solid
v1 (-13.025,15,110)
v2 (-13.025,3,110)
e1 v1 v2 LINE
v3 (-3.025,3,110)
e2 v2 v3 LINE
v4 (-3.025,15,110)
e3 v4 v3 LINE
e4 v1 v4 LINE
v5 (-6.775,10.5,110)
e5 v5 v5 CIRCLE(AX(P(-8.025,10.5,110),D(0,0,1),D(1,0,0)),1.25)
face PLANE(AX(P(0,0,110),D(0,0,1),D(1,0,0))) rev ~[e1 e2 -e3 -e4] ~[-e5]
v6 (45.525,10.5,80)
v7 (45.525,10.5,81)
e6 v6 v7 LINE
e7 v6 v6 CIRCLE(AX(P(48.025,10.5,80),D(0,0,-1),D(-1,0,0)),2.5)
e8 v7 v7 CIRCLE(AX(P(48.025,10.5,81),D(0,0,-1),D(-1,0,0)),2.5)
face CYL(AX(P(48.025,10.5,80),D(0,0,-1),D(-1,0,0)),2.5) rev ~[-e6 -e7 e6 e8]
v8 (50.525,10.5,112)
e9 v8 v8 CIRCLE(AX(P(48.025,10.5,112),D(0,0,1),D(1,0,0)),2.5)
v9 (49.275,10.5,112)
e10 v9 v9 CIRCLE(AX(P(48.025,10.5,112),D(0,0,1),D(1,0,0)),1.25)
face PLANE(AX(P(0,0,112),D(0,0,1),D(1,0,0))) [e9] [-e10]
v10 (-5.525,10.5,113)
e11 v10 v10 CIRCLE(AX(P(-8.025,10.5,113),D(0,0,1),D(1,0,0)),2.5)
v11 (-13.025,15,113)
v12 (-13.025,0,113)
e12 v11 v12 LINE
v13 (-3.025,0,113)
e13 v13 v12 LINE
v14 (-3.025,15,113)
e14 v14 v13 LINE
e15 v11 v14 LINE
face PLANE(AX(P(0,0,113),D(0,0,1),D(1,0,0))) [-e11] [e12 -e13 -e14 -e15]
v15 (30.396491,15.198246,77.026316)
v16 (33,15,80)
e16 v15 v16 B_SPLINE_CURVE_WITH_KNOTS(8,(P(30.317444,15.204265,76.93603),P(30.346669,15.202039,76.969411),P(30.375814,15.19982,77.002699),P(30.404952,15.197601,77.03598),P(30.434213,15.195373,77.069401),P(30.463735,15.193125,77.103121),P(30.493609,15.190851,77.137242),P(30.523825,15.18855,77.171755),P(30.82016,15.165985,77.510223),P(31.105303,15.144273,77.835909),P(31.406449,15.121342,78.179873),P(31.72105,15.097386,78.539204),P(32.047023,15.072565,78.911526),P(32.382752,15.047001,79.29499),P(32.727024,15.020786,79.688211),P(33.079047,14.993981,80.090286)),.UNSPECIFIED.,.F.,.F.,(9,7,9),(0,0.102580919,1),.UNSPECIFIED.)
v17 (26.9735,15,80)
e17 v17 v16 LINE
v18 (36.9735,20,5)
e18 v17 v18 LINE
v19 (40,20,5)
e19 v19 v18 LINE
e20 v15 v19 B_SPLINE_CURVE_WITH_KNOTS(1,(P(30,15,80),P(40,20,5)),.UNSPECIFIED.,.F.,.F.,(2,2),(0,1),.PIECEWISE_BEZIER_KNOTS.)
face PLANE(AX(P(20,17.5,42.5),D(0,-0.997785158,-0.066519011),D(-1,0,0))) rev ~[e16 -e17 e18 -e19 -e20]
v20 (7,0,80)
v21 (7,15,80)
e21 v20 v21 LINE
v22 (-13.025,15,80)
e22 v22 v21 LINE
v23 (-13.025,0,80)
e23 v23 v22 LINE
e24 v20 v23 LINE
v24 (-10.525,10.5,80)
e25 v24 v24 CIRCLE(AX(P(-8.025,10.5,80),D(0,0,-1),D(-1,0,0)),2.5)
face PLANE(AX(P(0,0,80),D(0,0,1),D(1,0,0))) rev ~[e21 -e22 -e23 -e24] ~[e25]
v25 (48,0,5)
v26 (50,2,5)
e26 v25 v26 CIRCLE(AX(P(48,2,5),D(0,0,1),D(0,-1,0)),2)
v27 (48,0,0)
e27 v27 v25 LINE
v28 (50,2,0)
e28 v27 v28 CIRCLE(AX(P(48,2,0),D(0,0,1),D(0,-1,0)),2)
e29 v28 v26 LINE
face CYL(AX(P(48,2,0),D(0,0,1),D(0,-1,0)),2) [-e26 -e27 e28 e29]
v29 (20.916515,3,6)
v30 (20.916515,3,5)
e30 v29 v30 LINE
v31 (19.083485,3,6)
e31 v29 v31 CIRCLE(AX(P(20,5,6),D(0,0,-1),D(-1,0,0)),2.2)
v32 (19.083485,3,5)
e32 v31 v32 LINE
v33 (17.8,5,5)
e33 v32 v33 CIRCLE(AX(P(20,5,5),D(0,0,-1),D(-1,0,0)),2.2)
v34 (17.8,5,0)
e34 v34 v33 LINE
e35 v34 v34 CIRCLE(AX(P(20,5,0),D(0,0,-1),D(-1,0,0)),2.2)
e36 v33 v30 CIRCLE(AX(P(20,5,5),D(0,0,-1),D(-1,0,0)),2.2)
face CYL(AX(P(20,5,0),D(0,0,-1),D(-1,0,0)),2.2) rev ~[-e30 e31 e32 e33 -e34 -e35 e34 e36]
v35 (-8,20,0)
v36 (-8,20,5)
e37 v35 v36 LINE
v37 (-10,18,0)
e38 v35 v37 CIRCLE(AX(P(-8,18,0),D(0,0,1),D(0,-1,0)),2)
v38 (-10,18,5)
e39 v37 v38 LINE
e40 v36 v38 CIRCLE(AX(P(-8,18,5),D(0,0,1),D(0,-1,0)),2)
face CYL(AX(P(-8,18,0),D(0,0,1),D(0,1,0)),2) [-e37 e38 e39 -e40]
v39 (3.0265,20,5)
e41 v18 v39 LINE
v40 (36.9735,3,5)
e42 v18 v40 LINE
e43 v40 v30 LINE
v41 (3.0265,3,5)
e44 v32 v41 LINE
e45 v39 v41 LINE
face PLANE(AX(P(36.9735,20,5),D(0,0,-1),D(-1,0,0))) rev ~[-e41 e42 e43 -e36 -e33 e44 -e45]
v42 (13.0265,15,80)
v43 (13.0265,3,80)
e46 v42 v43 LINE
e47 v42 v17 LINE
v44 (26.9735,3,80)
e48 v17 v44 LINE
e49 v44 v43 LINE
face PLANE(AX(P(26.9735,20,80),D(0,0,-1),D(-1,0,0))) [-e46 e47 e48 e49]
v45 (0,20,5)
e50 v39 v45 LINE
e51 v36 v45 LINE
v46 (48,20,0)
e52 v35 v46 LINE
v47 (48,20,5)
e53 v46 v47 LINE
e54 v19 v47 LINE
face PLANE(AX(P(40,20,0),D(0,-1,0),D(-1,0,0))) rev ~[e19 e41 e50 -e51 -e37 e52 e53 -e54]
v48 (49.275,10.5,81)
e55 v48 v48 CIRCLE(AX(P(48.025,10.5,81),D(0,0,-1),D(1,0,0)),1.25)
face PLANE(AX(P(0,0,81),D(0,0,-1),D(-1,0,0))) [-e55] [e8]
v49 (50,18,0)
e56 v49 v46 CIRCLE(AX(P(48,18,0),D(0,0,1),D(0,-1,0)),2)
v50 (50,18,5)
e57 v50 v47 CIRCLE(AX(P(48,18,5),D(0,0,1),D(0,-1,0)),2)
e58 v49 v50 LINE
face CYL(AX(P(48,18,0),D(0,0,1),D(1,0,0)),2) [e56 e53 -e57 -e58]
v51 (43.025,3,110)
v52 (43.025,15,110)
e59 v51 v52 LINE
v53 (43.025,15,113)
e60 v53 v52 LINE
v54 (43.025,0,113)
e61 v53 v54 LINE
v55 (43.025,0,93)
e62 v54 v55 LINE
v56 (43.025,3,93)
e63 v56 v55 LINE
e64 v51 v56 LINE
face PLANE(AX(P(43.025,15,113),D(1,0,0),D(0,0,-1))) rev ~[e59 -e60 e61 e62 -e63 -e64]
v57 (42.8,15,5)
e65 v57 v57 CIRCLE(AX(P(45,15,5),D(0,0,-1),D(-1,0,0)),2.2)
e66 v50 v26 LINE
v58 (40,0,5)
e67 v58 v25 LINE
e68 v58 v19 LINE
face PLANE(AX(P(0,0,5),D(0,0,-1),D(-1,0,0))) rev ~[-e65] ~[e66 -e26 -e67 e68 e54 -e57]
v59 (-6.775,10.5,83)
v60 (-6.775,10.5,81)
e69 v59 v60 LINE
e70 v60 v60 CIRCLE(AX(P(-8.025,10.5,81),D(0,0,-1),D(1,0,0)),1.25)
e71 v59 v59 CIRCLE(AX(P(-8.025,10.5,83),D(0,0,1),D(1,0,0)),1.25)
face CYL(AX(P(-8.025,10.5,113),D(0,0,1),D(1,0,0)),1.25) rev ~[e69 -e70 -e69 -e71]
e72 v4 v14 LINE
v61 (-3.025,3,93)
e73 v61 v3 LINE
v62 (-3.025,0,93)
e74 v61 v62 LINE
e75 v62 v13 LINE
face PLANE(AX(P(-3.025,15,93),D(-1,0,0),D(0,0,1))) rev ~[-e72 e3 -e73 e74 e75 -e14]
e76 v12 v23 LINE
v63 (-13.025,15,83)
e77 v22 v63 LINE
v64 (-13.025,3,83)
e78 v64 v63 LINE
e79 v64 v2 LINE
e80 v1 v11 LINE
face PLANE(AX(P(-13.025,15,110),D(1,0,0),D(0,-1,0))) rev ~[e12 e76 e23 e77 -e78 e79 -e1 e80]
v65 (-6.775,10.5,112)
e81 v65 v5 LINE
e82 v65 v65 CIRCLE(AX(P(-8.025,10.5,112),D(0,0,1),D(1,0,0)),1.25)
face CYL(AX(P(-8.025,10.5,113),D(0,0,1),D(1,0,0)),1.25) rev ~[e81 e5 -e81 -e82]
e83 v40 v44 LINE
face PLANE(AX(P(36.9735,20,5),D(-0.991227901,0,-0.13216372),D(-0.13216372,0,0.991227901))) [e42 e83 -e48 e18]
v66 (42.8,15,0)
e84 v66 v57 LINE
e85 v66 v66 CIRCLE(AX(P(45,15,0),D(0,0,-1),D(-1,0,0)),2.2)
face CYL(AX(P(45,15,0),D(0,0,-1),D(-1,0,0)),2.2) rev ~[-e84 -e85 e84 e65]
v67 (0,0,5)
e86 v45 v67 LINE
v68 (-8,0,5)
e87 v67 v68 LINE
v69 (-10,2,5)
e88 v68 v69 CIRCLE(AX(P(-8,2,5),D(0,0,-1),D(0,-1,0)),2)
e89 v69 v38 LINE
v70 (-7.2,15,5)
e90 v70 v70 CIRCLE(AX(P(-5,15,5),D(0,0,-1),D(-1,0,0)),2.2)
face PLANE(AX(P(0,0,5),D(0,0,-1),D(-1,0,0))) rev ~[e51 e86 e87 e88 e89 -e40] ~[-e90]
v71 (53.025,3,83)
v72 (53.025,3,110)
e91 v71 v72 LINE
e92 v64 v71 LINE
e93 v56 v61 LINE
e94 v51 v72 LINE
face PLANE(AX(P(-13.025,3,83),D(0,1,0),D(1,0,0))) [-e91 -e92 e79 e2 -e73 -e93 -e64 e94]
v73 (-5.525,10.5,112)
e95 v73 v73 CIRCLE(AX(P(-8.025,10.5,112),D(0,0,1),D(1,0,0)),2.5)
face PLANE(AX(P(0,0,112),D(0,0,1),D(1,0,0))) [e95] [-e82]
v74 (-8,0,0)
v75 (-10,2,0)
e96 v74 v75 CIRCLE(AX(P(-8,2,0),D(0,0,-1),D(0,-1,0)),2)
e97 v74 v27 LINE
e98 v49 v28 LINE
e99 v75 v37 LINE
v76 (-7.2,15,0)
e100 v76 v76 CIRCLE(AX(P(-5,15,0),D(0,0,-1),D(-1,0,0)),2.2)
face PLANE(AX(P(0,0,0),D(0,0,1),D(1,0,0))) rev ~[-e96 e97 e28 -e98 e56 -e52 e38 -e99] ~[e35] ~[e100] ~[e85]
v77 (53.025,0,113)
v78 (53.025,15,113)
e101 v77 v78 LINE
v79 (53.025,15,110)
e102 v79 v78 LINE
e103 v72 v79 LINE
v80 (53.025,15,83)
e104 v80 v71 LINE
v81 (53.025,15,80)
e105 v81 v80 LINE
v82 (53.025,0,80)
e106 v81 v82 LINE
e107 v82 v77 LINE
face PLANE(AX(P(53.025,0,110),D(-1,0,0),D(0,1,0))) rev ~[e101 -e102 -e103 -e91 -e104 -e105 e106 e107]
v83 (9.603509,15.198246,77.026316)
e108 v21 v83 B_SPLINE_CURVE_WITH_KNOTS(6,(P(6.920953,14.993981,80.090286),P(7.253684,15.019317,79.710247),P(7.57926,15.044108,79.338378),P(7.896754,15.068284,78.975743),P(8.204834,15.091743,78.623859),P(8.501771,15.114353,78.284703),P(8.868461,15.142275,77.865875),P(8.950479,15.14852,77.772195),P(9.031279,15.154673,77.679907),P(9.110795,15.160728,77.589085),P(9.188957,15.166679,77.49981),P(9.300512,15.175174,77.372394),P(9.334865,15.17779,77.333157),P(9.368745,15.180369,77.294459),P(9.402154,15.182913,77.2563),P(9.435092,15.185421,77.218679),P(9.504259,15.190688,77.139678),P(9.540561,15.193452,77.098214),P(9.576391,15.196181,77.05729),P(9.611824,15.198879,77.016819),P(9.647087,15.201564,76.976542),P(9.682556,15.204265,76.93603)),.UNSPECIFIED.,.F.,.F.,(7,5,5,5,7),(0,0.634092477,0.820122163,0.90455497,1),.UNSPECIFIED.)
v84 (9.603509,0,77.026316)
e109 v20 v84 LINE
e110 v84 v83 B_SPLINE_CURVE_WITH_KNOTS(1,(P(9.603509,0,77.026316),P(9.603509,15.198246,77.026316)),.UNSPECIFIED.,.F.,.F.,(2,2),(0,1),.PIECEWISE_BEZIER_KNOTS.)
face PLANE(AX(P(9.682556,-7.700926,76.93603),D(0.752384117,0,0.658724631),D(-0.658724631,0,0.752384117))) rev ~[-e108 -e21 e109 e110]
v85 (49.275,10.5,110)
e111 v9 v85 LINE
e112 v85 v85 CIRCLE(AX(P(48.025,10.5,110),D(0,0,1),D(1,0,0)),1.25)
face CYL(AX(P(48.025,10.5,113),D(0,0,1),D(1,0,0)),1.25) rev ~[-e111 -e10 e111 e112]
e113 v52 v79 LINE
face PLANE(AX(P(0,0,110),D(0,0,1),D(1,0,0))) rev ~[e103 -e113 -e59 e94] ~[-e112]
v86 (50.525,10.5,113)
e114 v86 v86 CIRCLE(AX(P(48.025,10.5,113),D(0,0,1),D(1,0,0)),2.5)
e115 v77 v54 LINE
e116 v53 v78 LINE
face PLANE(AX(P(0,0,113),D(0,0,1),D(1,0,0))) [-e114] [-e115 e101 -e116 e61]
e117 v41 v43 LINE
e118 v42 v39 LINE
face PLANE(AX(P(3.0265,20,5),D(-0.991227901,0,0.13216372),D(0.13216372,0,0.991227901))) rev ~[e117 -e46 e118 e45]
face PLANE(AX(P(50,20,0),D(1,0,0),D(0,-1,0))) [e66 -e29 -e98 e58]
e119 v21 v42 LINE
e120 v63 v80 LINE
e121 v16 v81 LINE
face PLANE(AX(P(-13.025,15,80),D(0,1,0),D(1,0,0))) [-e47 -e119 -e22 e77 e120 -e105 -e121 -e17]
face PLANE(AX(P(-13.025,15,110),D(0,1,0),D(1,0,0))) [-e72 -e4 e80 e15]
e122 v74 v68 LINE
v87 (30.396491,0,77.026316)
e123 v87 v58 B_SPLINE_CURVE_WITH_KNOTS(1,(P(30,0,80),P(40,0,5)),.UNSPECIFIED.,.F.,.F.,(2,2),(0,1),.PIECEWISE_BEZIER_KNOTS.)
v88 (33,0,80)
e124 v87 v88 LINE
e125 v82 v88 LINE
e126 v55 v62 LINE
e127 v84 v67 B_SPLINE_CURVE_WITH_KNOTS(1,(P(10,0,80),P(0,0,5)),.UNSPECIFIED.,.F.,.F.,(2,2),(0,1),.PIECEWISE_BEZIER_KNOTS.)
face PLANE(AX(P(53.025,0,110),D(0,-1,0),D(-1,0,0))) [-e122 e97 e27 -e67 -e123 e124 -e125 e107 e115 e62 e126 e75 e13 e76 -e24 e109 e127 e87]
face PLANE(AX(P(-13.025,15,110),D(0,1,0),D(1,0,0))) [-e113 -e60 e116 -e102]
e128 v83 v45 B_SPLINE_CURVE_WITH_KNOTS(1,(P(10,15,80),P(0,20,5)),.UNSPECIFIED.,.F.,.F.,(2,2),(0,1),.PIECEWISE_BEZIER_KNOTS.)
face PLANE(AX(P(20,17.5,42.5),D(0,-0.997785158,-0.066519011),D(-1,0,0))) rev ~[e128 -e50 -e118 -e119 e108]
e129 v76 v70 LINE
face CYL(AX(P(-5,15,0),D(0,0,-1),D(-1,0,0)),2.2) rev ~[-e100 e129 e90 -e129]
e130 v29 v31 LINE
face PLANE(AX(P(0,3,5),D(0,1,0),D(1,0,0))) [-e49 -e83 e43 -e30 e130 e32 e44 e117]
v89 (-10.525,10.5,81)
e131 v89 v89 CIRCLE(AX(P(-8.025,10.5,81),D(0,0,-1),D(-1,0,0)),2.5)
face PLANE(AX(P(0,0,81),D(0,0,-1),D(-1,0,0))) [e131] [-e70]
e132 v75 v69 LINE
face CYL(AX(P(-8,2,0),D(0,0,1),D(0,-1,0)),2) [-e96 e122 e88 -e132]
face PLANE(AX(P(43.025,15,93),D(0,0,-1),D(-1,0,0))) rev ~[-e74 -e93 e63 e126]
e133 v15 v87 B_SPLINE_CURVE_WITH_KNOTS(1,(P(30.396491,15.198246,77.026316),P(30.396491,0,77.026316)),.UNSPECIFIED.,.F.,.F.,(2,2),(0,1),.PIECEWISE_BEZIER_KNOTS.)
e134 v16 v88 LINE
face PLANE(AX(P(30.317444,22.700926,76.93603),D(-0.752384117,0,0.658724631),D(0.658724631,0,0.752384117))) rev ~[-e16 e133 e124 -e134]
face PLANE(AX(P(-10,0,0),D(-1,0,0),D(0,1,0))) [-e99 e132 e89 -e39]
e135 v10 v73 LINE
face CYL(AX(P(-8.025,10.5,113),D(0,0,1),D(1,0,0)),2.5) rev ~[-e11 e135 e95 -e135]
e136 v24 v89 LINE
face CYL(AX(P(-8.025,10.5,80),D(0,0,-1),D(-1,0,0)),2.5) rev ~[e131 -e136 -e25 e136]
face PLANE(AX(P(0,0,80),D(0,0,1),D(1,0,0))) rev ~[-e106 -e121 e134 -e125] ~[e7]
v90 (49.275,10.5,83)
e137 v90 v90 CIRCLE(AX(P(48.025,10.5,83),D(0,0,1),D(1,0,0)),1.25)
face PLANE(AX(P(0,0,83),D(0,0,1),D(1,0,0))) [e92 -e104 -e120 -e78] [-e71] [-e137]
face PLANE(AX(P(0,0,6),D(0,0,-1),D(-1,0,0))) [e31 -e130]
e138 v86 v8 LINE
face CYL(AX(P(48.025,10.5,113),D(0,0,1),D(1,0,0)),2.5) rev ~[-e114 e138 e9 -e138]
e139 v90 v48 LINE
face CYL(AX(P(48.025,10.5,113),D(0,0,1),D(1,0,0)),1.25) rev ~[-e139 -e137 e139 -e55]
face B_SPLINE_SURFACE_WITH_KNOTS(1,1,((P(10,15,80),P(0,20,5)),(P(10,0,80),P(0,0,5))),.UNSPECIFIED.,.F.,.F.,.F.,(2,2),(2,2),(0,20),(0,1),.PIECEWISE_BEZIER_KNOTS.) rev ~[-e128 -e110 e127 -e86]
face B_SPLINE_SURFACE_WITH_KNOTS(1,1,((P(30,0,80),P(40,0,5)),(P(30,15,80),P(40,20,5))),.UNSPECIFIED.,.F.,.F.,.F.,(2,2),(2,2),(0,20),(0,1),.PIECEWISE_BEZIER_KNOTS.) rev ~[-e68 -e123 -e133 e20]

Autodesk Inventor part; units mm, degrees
ref_plane "YZ Plane" through (0, 0, 0) normal (1, 0, 0) x (0, 1, 0)
ref_plane "XZ Plane" through (0, 0, 0) normal (0, 1, 0) x (-1, 0, 0)
sketch "Sketch1" plane through (0, 0, 0) normal (0, 0, 1) x (1, 0, 0)
  line L0 (0, 0) -> (40, 0)
  line L1 (40, 0) -> (40, 20)
  line L2 (40, 20) -> (0, 20)
  line L3 (0, 20) -> (0, 0)
  dimension "d69" = 20
  dimension "d70" = 40
extrude "Extrusion1" add sketch "Sketch1" along normal blind 5
sketch "Sketch2" plane through (0, 0, 5) normal (0, 0, 1) x (1, 0, 0)
  line L0 (40, 20) -> (0, 20) projected
  line L1 (0, 0) -> (40, 0) projected
  line L2 (0, 20) -> (40, 20)
  line L3 (40, 20) -> (40, 0)
  line L4 (40, 0) -> (0, 0)
  line L5 (0, 0) -> (0, 20)
ref_plane "Work Plane1" through (0, 0, 80) normal (0, 0, 1) x (1, 0, 0)
sketch "Sketch3" plane through (0, 0, 80) normal (0, 0, 1) x (1, 0, 0)
  line L0 (10, 15) -> (30, 15)
  line L1 (30, 15) -> (30, 0)
  line L2 (30, 0) -> (10, 0)
  line L3 (10, 0) -> (10, 15)
  line L4 (0, 20) -> (0, 0) projected
  dimension "d71" = 20
  dimension "d72" = 15
  dimension "d73" = 10
loft "Loft1" add profiles "Sketch3" section 2 edges at (40, 10, 5) (20, 20, 5) (0, 10, 5) (20, 0, 5)
sketch "Sketch4" plane through (0, 0, 80) normal (0, 0, 1) x (1, 0, 0)
  line L0 (53.025, 0) -> (-13.025, 0)
  line L1 (-13.025, 0) -> (-13.025, 15)
  line L2 (-13.025, 15) -> (53.025, 15)
  line L3 (53.025, 15) -> (53.025, 0)
  line L4 (30, 0) -> (10, 0) projected
  point P0 (0, 0)
  dimension "d16" = 66.05
  dimension "d18" = 15
  dimension "d76" = 0
  dimension "d78" = 13.025
extrude "Extrusion2" add sketch "Sketch4" along normal blind 3
sketch "Sketch5" plane through (0, 0, 83) normal (0, 0, 1) x (1, 0, 0)
  line L0 (-13.025, 0) -> (53.025, 0) projected
  line L1 (-13.025, 15) -> (-13.025, 0) projected
  line L2 (53.025, 0) -> (-13.025, 0)
  line L3 (-13.025, 0) -> (-13.025, 3)
  line L4 (-13.025, 3) -> (53.025, 3)
  line L5 (53.025, 3) -> (53.025, 0)
  point P0 (0, 0)
  dimension "d22" = 3
extrude "Extrusion3" add sketch "Sketch5" along normal blind 27
sketch "Sketch6" plane through (0, 0, 110) normal (0, 0, 1) x (1, 0, 0)
  line L0 (53.025, 0) -> (53.025, 15) projected
  line L1 (-13.025, 15) -> (-13.025, 0) projected
  line L2 (53.025, 0) -> (-13.025, 0)
  line L3 (-13.025, 0) -> (-13.025, 15)
  line L4 (-13.025, 15) -> (53.025, 15)
  line L5 (53.025, 15) -> (53.025, 0)
  point P0 (0, 0)
extrude "Extrusion4" add sketch "Sketch6" along normal blind 3
sketch "Sketch7" plane through (0, 0, 113) normal (0, 0, 1) x (1, 0, 0)
  circle A0 centre (-8.025, 10.5) radius 1.25
  circle A1 centre (48.025, 10.5) radius 1.25
  line L0 (53.025, 3) -> (-13.025, 3) projected
  line L1 (-13.025, 3) -> (53.025, 3) projected
  point P0 (0, 0)
  point P1 (20, 3)
  dimension "d27" = 7.5
  dimension "d28" = 7.5
  dimension "d29" = 56.05
  dimension "d30" = 28.025
  dimension "d31" = 2.5
  dimension "d32" = 2.5
extrude "Extrusion5" cut sketch "Sketch7" against normal blind 35
sketch "Sketch10" plane through (0, 0, 113) normal (0, 0, 1) x (1, 0, 0)
  circle A0 centre (48.025, 10.5) radius 1.25 projected
  circle A1 centre (48.025, 10.5) radius 2.5
  circle A2 centre (-8.025, 10.5) radius 1.25 projected
  circle A3 centre (-8.025, 10.5) radius 2.5
  point P0 (0, 0)
  dimension "d61" = 5
  dimension "d62" = 5
extrude "Extrusion8" cut sketch "Sketch10" against normal blind 1
sketch "Sketch11" plane through (0, 0, 80) normal (0, 0, -1) x (-1, 0, 0)
  circle A0 centre (-48.025, 10.5) radius 1.25 projected
  circle A1 centre (-48.025, 10.5) radius 2.5
  circle A2 centre (8.025, 10.5) radius 1.25 projected
  circle A3 centre (8.025, 10.5) radius 2.5
  point P0 (0, 0)
  dimension "d65" = 5
  dimension "d66" = 5
extrude "Extrusion9" cut sketch "Sketch11" against normal blind 1
sketch "Sketch12" plane through (-13.025, 15, 110) normal (0, 1, 0) x (1, 0, 0)
  line L0 (0, -3) -> (66.05, -3) projected
  line L1 (10, -3) -> (56.05, -3)
  line L2 (56.05, -3) -> (56.05, 17)
  line L3 (56.05, 17) -> (10, 17)
  line L4 (10, 17) -> (10, -3)
  line L5 (0, 27) -> (0, 0) projected
  line L6 (66.05, 27) -> (66.05, 0) projected
  line L7 (66.05, 27) -> (0, 27) projected
  point P0 (13.025, 110)
  dimension "d79" = 10
  dimension "d80" = 10
  dimension "d81" = 10
extrude "Extrusion10" cut sketch "Sketch12" against normal blind 15
sketch "Sketch15" plane through (0, 0, 0) normal (0, 0, -1) x (-1, 0, 0)
  line L0 (-30, 0) -> (-53.025, 0) projected
  line L1 (10, 20) -> (-50, 20)
  line L2 (-50, 20) -> (-50, 0)
  line L3 (-50, 0) -> (10, 0)
  line L4 (10, 0) -> (10, 20)
  line L5 (0, 20) -> (0, 0) projected
  line L6 (-40, 0) -> (-40, 20) projected
  dimension "d119" = 10
  dimension "d120" = 10
extrude "Extrusion13" add sketch "Sketch15" against normal blind 5 contours L0 L2 L1 L6 | L5 L1 L4 L3
fillet "Fillet1" radius 2 4 edges at (50, 20, 2.5) (50, 0, 2.5) (-10, 20, 2.5) (-10, 0, 2.5)
chamfer "Chamfer1" distance 3 angle 45 2 edges at (10, 7.5, 80) (30, 7.5, 80)
sketch "Sketch17" plane through (0, 20, 5) normal (0, 1, 0) x (1, 0, 0)
  line L0 (40, 0) -> (0, 0) projected
  line L1 (3.0265, 0) -> (13.0265, -75)
  line L2 (33, -75) -> (7, -75) projected
  line L3 (36.9735, 0) -> (26.9735, -75)
  line L4 (9.6035, -72.0263) -> (0, 0) projected
  line L5 (30.3965, -72.0263) -> (40, 0) projected
  point P0 (0, 5)
  dimension "d138" = 3
  dimension "d139" = 3
extrude "Extrusion15" cut sketch "Sketch17" against normal blind 17
sketch "Sketch16" plane through (0, 0, 0) normal (0, 0, -1) x (-1, 0, 0)
  circle A0 centre (-45, 15) radius 2.2
  circle A1 centre (5, 15) radius 2.2
  circle A2 centre (-20, 5) radius 2.2
  line L0 (-50, 20) -> (-50, 0) projected
  line L1 (10, 20) -> (-50, 20) projected
  line L2 (10, 0) -> (10, 20) projected
  line L3 (-50, 0) -> (10, 0) projected
  point P0 (0, 0)
  dimension "d123" = 5
  dimension "d124" = 5
  dimension "d125" = 4.4
  dimension "d126" = 4.4
  dimension "d127" = 5
  dimension "d128" = 5
  dimension "d129" = 5
  dimension "d130" = 4.4
  dimension "d134" = 30
extrude "Extrusion16" cut sketch "Sketch16" against normal blind 6 contours A0 | A1 | A2
equation "\"d30\" = 0.5 * d29"
properties part number "RL_spider_camera_mount"
